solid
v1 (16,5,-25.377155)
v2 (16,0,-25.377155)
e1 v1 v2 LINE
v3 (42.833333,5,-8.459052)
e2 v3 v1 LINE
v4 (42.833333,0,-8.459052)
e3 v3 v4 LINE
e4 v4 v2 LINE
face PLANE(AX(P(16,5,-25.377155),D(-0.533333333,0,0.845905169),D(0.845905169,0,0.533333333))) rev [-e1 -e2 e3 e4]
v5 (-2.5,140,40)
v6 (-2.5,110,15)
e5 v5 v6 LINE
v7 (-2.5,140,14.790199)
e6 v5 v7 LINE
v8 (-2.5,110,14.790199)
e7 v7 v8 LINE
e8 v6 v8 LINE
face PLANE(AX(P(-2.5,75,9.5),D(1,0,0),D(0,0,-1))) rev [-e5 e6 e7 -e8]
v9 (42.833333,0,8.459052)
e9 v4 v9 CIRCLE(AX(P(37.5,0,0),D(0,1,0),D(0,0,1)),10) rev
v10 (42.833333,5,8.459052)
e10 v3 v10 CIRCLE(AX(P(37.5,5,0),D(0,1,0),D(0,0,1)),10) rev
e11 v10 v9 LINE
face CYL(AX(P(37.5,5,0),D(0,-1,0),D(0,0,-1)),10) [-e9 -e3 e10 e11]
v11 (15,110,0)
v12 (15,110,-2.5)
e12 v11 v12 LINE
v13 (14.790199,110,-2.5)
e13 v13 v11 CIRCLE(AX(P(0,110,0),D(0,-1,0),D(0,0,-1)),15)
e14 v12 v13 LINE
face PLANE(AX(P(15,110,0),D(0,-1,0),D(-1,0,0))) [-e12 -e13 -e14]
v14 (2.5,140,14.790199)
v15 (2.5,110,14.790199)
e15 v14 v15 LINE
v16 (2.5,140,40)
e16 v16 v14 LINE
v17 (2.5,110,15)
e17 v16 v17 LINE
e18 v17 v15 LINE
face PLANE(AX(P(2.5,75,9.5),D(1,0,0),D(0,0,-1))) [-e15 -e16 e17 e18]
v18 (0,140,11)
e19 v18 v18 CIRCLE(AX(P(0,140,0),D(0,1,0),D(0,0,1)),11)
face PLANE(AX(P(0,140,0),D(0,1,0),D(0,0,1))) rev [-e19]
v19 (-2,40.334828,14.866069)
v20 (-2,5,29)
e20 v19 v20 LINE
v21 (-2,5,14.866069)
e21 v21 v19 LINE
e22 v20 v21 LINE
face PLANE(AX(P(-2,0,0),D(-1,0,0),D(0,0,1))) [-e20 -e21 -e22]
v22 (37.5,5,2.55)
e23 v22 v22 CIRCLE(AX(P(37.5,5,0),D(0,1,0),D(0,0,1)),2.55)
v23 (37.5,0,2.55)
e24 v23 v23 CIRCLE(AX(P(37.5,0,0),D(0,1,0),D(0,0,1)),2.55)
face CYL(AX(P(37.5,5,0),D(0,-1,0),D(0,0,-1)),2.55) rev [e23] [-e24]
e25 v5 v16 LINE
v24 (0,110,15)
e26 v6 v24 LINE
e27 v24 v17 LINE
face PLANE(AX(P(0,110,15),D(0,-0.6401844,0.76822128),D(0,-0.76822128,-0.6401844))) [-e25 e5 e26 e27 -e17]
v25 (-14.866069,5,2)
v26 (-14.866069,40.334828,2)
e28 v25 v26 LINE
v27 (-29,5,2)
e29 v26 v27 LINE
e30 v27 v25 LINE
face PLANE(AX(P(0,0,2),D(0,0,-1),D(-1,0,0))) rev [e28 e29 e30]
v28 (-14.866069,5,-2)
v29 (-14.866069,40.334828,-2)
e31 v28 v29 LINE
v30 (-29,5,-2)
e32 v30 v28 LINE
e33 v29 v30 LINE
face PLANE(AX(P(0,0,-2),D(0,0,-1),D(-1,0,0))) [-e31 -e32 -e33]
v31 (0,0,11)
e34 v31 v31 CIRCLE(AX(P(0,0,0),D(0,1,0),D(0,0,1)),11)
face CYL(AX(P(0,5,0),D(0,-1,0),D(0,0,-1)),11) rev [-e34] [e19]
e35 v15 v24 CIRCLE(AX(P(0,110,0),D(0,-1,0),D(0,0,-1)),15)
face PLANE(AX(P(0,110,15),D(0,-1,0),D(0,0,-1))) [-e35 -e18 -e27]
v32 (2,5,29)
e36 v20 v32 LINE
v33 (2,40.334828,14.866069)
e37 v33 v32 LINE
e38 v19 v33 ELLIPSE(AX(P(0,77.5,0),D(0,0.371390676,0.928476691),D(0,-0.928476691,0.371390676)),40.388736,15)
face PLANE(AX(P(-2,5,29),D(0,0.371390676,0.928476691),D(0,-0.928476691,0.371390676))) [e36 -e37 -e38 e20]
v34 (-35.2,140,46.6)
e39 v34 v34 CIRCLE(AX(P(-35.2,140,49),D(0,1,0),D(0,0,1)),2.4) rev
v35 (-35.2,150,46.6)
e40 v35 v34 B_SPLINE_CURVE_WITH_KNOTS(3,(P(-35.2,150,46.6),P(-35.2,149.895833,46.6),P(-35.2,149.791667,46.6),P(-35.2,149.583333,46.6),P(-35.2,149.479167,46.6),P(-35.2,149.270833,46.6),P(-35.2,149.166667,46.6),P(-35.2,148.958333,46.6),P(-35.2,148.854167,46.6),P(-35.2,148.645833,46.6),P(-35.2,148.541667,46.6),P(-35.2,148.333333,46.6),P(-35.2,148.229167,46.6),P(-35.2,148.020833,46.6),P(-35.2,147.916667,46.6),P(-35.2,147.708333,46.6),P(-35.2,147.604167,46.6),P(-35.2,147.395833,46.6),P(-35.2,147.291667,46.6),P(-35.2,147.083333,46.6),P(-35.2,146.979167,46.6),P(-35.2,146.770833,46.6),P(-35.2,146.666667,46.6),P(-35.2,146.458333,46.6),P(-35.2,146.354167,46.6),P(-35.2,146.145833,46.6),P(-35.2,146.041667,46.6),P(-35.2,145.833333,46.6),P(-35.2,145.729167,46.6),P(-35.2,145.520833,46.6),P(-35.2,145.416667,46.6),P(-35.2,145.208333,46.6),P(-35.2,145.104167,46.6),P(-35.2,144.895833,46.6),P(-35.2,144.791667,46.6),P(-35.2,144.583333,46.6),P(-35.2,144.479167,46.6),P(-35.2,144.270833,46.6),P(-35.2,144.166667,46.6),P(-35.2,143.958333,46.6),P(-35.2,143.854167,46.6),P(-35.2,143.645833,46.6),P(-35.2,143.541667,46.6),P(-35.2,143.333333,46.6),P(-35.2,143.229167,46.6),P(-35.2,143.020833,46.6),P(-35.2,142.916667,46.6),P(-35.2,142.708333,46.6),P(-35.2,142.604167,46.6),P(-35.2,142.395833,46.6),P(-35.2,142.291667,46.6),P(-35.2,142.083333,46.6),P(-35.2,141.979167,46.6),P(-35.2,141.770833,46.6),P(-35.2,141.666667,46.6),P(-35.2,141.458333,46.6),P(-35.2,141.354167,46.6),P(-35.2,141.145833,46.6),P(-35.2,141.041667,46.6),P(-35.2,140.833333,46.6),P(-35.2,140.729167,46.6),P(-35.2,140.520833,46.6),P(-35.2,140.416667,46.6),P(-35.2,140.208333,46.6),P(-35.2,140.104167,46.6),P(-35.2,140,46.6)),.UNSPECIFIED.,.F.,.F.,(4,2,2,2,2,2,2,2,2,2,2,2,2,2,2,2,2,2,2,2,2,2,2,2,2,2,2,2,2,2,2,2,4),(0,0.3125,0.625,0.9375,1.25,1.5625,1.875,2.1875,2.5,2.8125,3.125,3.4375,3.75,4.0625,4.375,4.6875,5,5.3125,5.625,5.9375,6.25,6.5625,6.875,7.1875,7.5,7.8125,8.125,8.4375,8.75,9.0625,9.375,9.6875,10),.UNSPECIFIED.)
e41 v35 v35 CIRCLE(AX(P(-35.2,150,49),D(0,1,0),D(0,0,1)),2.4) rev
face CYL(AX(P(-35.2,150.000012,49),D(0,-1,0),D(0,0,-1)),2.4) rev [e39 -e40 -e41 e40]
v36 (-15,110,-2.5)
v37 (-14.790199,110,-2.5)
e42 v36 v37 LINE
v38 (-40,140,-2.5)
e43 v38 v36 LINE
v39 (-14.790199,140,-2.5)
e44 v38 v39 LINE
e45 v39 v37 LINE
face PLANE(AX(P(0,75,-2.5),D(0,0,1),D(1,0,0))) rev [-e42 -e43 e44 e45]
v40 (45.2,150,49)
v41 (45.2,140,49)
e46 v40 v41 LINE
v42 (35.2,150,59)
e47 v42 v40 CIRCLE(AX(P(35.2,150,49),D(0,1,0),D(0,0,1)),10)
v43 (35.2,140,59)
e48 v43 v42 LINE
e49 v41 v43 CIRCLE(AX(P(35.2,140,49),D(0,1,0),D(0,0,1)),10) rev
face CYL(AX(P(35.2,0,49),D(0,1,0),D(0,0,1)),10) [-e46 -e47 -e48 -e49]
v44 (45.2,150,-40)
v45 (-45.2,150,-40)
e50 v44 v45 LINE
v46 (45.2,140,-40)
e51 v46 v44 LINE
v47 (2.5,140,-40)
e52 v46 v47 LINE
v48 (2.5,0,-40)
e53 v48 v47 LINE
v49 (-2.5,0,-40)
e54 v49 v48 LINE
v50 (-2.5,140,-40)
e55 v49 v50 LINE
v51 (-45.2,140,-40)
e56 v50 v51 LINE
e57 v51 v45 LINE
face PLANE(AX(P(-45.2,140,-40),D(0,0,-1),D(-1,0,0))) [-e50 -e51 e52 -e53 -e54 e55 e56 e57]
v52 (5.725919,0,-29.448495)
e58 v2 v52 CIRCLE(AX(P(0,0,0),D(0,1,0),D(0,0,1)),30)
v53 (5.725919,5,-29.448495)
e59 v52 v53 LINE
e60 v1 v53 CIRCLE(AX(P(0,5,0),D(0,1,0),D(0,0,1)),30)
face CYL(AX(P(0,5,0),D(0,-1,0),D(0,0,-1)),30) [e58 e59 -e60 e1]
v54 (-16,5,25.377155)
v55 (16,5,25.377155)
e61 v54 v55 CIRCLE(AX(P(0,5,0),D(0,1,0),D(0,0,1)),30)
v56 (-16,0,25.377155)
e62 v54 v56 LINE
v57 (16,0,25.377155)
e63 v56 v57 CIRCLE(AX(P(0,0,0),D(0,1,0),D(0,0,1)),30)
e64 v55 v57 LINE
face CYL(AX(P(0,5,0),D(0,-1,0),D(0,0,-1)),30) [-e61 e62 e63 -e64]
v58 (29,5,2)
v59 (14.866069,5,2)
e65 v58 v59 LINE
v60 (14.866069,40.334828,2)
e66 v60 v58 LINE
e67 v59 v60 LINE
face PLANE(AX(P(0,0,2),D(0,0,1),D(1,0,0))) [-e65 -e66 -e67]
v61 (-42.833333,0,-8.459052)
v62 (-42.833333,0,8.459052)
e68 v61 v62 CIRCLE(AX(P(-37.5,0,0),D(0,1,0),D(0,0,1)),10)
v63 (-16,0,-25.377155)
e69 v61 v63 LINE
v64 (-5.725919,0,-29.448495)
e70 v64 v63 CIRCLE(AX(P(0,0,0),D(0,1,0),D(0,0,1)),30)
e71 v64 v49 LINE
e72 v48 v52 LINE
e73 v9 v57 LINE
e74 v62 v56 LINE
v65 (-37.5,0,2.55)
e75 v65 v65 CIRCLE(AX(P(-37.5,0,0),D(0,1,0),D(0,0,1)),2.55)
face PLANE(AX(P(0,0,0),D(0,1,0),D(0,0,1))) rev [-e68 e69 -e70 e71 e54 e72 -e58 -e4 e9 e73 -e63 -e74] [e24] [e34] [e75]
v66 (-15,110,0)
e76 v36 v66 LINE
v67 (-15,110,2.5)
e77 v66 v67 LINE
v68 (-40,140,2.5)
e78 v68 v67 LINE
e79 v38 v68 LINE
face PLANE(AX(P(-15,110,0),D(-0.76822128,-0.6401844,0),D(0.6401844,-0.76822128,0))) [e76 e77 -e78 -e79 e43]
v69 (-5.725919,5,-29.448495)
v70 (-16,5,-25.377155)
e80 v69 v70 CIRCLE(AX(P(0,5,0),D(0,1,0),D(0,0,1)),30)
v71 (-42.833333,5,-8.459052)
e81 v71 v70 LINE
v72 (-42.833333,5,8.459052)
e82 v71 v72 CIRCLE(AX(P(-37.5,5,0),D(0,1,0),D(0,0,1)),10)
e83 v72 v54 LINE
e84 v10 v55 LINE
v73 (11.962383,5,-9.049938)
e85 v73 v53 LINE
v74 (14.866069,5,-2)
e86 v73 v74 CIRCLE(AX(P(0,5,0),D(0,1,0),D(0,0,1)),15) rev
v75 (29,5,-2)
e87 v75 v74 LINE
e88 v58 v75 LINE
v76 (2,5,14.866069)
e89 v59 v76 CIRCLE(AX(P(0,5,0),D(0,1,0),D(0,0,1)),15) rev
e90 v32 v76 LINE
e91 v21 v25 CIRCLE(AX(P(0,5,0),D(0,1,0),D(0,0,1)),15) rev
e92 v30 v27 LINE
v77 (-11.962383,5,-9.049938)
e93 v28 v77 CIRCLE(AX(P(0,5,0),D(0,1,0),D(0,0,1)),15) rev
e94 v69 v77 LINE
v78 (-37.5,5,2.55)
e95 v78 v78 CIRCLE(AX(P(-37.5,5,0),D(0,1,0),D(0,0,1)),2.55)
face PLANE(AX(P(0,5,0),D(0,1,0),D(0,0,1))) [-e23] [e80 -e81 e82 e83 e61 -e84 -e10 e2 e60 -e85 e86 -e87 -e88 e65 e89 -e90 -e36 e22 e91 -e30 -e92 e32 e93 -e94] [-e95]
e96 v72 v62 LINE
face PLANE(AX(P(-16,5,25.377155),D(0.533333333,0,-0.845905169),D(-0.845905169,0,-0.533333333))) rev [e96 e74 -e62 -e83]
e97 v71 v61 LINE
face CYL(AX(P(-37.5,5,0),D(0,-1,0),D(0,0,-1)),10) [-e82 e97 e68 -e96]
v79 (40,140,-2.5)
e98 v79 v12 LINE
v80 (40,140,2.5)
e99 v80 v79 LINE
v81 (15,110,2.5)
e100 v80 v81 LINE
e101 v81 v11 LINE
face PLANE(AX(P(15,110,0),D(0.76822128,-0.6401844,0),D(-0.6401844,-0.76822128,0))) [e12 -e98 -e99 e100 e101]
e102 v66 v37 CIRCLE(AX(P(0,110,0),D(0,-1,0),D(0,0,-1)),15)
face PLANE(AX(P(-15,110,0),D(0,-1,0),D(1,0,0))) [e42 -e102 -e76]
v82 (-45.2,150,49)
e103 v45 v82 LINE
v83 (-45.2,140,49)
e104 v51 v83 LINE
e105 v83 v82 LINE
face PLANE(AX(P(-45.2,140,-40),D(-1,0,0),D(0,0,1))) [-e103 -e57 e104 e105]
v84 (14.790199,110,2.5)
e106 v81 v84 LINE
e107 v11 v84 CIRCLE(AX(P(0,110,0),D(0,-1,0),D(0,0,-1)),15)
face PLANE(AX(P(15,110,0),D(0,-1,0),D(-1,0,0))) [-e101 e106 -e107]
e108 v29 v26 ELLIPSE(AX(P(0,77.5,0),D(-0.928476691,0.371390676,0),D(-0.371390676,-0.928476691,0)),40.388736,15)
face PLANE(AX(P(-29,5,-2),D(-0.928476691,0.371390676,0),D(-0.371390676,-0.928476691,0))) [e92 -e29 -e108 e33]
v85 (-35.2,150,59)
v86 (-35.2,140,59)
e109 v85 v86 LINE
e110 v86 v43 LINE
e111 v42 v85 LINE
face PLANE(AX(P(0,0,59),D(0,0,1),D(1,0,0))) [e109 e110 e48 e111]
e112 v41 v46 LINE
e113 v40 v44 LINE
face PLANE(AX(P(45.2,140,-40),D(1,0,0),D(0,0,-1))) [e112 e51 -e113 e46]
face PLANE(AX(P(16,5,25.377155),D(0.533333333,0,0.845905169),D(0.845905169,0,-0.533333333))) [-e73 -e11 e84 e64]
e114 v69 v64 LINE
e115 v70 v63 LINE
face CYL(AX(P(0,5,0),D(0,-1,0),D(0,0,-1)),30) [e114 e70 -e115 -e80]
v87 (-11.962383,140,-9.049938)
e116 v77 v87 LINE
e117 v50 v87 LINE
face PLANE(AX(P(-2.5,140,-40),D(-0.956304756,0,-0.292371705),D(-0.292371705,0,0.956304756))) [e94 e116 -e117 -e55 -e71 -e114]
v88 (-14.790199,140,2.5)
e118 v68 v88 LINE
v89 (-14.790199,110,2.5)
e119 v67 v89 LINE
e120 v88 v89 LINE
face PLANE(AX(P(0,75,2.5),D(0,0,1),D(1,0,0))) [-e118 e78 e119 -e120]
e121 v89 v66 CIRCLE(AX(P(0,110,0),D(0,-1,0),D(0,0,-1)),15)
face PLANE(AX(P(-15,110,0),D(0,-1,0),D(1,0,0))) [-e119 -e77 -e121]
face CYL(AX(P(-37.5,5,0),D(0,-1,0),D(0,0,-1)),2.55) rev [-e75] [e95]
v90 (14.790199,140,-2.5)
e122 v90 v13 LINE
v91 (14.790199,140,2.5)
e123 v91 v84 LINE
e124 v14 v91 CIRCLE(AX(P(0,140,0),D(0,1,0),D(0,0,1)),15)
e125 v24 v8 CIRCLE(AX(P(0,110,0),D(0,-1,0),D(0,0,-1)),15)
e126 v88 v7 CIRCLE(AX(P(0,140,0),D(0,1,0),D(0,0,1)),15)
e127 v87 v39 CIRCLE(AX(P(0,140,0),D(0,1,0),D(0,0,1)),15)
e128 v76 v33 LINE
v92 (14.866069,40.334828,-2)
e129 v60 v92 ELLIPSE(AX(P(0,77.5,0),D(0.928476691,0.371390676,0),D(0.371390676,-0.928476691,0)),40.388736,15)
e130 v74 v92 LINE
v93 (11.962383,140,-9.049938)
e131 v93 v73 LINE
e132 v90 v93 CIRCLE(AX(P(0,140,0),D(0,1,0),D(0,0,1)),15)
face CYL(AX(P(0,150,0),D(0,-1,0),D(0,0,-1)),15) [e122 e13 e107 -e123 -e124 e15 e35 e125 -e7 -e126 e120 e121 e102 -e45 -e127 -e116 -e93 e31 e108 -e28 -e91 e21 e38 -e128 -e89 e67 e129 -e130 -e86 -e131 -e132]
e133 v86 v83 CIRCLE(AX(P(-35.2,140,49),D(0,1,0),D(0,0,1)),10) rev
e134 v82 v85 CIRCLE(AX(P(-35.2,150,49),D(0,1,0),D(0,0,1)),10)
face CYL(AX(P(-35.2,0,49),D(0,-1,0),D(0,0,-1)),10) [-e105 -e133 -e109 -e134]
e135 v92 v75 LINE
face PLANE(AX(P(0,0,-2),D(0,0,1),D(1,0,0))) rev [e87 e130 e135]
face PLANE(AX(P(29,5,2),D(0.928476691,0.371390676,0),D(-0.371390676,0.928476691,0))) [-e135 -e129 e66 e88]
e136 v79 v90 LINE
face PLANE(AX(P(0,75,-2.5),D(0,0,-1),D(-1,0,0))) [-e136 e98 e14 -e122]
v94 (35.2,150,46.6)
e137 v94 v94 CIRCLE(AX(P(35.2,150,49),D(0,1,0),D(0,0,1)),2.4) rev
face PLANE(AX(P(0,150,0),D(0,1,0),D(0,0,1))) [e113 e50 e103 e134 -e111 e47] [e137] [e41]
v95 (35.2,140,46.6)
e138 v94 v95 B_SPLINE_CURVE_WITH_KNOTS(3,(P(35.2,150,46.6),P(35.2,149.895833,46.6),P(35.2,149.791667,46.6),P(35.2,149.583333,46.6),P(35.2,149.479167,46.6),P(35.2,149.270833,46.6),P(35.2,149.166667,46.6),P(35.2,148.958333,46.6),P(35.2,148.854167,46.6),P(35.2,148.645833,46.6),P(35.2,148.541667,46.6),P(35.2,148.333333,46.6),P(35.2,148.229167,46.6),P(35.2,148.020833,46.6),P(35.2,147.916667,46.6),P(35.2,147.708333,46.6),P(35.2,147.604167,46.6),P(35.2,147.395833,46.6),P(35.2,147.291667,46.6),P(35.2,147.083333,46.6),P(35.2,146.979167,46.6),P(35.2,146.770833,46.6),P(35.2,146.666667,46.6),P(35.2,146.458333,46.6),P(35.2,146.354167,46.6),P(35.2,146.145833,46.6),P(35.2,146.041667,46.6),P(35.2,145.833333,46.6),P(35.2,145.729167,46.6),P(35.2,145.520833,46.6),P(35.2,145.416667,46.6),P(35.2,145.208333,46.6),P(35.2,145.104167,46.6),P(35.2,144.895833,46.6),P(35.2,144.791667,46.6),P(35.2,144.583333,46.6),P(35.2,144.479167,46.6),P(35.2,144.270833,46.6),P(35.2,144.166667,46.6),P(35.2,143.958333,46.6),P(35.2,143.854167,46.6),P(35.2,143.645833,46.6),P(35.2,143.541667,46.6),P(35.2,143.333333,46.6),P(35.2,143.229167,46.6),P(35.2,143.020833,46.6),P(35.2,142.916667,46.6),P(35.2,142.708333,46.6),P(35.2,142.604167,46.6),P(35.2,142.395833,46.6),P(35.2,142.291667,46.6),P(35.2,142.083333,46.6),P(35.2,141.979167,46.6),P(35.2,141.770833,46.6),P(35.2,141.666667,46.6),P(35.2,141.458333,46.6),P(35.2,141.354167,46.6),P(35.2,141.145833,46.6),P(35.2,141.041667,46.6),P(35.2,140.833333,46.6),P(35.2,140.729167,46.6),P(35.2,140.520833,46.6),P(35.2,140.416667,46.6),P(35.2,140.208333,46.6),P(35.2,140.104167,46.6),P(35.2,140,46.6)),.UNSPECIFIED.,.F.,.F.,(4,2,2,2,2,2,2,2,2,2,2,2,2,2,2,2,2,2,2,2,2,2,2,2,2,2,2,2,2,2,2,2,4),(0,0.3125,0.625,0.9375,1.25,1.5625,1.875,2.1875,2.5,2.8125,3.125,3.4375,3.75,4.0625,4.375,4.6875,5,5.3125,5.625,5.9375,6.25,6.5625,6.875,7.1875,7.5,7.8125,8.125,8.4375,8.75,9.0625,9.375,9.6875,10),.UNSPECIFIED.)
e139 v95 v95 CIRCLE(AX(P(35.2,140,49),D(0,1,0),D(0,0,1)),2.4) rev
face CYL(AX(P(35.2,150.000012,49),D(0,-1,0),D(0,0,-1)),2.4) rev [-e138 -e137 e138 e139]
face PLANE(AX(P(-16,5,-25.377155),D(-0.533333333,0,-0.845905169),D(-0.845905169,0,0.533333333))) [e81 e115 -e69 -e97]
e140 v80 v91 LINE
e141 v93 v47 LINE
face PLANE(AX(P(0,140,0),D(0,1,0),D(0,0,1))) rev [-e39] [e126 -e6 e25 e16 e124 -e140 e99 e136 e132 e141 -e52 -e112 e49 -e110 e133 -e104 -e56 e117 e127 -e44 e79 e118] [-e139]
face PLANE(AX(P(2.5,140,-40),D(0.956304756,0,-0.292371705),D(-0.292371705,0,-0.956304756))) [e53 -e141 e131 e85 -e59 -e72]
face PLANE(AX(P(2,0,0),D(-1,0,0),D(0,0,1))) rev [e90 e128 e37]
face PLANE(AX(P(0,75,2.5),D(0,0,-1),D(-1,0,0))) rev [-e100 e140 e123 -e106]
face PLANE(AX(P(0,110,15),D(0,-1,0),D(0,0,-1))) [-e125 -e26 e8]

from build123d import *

# Parameters (mm, degrees)
SKETCH1_R                      = 2.55
SKETCH1_R_2                    = 11
BASE_DEPTH                     = 5
SKETCH1_3_R                    = 15
SKETCH1_3_R_2                  = 11
STEM_DEPTH                     = 150
RIBS_DEPTH                     = 2
CIRPATTERN1_COUNT              = 4
SKETCH4_W                      = 90.4
SKETCH4_H                      = 80
TOP_PLATE_DEPTH                = 10
SKETCH6_W                      = 90.4
SKETCH6_H                      = 10
BOSS_EXTRUDE7_DEPTH            = 19
RIB1_START                     = -2.5
RIB1_DEPTH                     = 5
CIRPATTERN6_COUNT              = 4
CUT_EXTRUDE1_REACH             = 170.039
SKETCH10_R                     = 2.4
CUT_EXTRUDE1_DIRECTION_2_DEPTH = 169.039429897
FILLET1_R                      = 10
FILLET2_R                      = 10
SKETCH13_W                     = 5
SKETCH13_H                     = 25.209800542
BOSS_EXTRUDE10_DEPTH           = 140
BOSS_EXTRUDE11_DEPTH           = 141
BOSS_EXTRUDE11_START           = -9.462383487
BOSS_EXTRUDE11_2_DEPTH         = 9.462383487
BOSS_EXTRUDE11_START_2         = -22
BOSS_EXTRUDE11_3_OUTLINE_W     = 26
BOSS_EXTRUDE11_3_OUTLINE_H     = 36
BOSS_EXTRUDE11_3_DEPTH         = 10.305131811
SKETCH16_W                     = 125.849741583
SKETCH16_H                     = 86.760976346
CUT_EXTRUDE2_DEPTH             = 169.039429897


with BuildPart() as part:
    # Sketch1 → base (new body)
    with BuildSketch(Plane(origin=(0, 0, 0), x_dir=(1, 0, 0), z_dir=(0, 1, 0))):
        with BuildLine():
            Line((-16, 25.377155081), (-42.833333333, 8.459051694))
            ThreePointArc((-42.833333333, 8.459051694), (-47.5, 0), (-42.833333333, -8.459051694))
            Line((-42.833333333, -8.459051694), (-16, -25.377155081))
            ThreePointArc((-16, -25.377155081), (0, -30), (16, -25.377155081))
            Line((16, -25.377155081), (42.833333333, -8.459051694))
            ThreePointArc((42.833333333, -8.459051694), (47.5, 0), (42.833333333, 8.459051694))
            Line((42.833333333, 8.459051694), (16, 25.377155081))
            ThreePointArc((16, 25.377155081), (0, 30), (-16, 25.377155081))
        make_face()
        with Locations(Location((-37.5, 0, 0), (0, 0, 270))):
            Circle(SKETCH1_R, mode=Mode.SUBTRACT)
        with Locations(Location((37.5, 0, 0), (0, 0, 270))):
            Circle(SKETCH1_R, mode=Mode.SUBTRACT)
        with Locations(Location((0, 0, 0), (0, 0, 270))):
            Circle(SKETCH1_R_2, mode=Mode.SUBTRACT)
    extrude(amount=BASE_DEPTH)

    # Sketch1<3> → stem (add)
    with BuildSketch(Plane(origin=(0, 0, 0), x_dir=(1, 0, 0), z_dir=(0, 1, 0))):
        with Locations(Location((0, 0, 0), (0, 0, 270))):
            Circle(SKETCH1_3_R)
        with Locations(Location((0, 0, 0), (0, 0, 270))):
            Circle(SKETCH1_3_R_2, mode=Mode.SUBTRACT)
    extrude(amount=STEM_DEPTH)

    # Sketch2 → ribs (add, symmetric)
    with BuildSketch(Plane(origin=(0, 0, 0), x_dir=(0, 0, -1), z_dir=(1, 0, 0))):
        Polygon((-13, 5), (-29, 5), (-13, 45), align=None)
    ribs = extrude(amount=RIBS_DEPTH, both=True)

    # CirPattern1: ribs ×4 about axis
    cirpattern1_axis = Axis((0, 0, 0), (0, 1, 0))
    for i in range(1, CIRPATTERN1_COUNT):
        add(ribs.rotate(cirpattern1_axis, i * 360 / CIRPATTERN1_COUNT))

    # Sketch4 → top plate (add)
    with BuildSketch(Plane(origin=(0, 150, 0), x_dir=(1, 0, 0), z_dir=(0, 1, 0))):
        Rectangle(SKETCH4_W, SKETCH4_H)
    extrude(amount=-TOP_PLATE_DEPTH)

    # Sketch6 → Boss-Extrude7 (add)
    with BuildSketch(Plane.XY.offset(40)):
        with Locations((0, 145)):
            Rectangle(SKETCH6_W, SKETCH6_H)
    extrude(amount=BOSS_EXTRUDE7_DEPTH)

    # Rib1: read off the stored shape, not the designer's step
    # Rib1 outline → Rib1 (add)
    with BuildSketch(Plane(origin=(0, 0, 0), x_dir=(0, 0, -1), z_dir=(1, 0, 0)).offset(RIB1_START)):
        Polygon((-15, 110), (-14.790199458, 110), (-14.790199458, 140), (-40, 140), align=None)
    rib1 = extrude(amount=RIB1_DEPTH)

    # CirPattern6: Rib1 ×4 about axis
    cirpattern6_axis = Axis((0, 0, 0), (0, 1, 0))
    for i in range(1, CIRPATTERN6_COUNT):
        add(rib1.rotate(cirpattern6_axis, i * 360 / CIRPATTERN6_COUNT))

    # Sketch10 → Cut-Extrude1 (cut, up to next)
    with BuildSketch(Plane(origin=(0, 150, 0), x_dir=(1, 0, 0), z_dir=(0, 1, 0)), mode=Mode.PRIVATE) as cut_extrude1_sk1:
        with Locations(Location((35.2, -49, 0), (0, 0, 90))):
            Circle(SKETCH10_R)
    cut_extrude1_tool1 = extrude(cut_extrude1_sk1.sketch, amount=-CUT_EXTRUDE1_REACH, mode=Mode.PRIVATE) & part.part
    # Sketch10 → Cut-Extrude1 (cut, up to next)
    with BuildSketch(Plane(origin=(0, 150, 0), x_dir=(1, 0, 0), z_dir=(0, 1, 0)), mode=Mode.PRIVATE) as cut_extrude1_sk2:
        with Locations(Location((-35.2, -49, 0), (0, 0, 90))):
            Circle(SKETCH10_R)
    cut_extrude1_tool2 = extrude(cut_extrude1_sk2.sketch, amount=-CUT_EXTRUDE1_REACH, mode=Mode.PRIVATE) & part.part
    add(cut_extrude1_tool1.solids().sort_by_distance((35.2, 150, 49))[0], mode=Mode.SUBTRACT)
    add(cut_extrude1_tool2.solids().sort_by_distance((-35.2, 150, 49))[0], mode=Mode.SUBTRACT)

    # Sketch10 → Cut-Extrude1 direction 2 (cut)
    with BuildSketch(Plane(origin=(0, 150, 0), x_dir=(1, 0, 0), z_dir=(0, 1, 0))):
        with Locations(Location((35.2, -49, 0), (0, 0, 90))):
            Circle(SKETCH10_R)
        with Locations(Location((-35.2, -49, 0), (0, 0, 90))):
            Circle(SKETCH10_R)
    extrude(amount=CUT_EXTRUDE1_DIRECTION_2_DEPTH, mode=Mode.SUBTRACT)

    # Fillet1
    fillet1_edges = [part.edges().sort_by_distance(p)[0] for p in [
        (-45.2, 145, 59),
    ]]
    fillet(fillet1_edges, radius=FILLET1_R)

    # Fillet2
    fillet2_edges = [part.edges().sort_by_distance(p)[0] for p in [
        (45.2, 145, 59),
    ]]
    fillet(fillet2_edges, radius=FILLET2_R)

    # Sketch13 → Boss-Extrude10 (add, through all)
    with BuildSketch(Plane.XZ.offset(-140)):
        with Locations((0, -27.395099729)):
            Rectangle(SKETCH13_W, SKETCH13_H)
    extrude(amount=BOSS_EXTRUDE10_DEPTH)

    # Boss-Extrude11: read off the stored shape, not the designer's step
    # Boss-Extrude11 outline → Boss-Extrude11 (add)
    with BuildSketch(Plane(origin=(0, 0, 0), x_dir=(1, 0, 0), z_dir=(0, 1, 0))):
        with BuildLine():
            ThreePointArc((2.5, 14.790199458), (7.779960403, 12.824672164), (11.962383487, 9.049938193))
            Line((11.962383487, 9.049938193), (2.5, 40))
            Line((2.5, 40), (2.5, 14.790199458))
        make_face()
        with BuildLine():
            ThreePointArc((-11.962383487, 9.049938193), (-7.779960403, 12.824672164), (-2.5, 14.790199458))
            Line((-2.5, 14.790199458), (-2.5, 40))
            Line((-2.5, 40), (-11.962383487, 9.049938193))
        make_face()
    extrude(amount=BOSS_EXTRUDE11_DEPTH)

    # Boss-Extrude11 2 outline → Boss-Extrude11 2 (add)
    with BuildSketch(Plane(origin=(0, 0, 0), x_dir=(1, 0, 0), z_dir=(0, 1, 0)).offset(BOSS_EXTRUDE11_START)):
        with BuildLine():
            Line((-2.5, 40), (-11.962383487, 9.049938193))
            ThreePointArc((-11.962383487, 9.049938193), (0, 15), (11.962383487, 9.049938193))
            Line((11.962383487, 9.049938193), (2.5, 40))
            Line((2.5, 40), (-2.5, 40))
        make_face()
    extrude(amount=BOSS_EXTRUDE11_2_DEPTH)

    # Boss-Extrude11 3 outline → Boss-Extrude11 3 (cut)
    with BuildSketch(Plane(origin=(0, 0, 0), x_dir=(1, 0, 0), z_dir=(0, 0.9563047559630354, 0.2923717047227371)).offset(BOSS_EXTRUDE11_START_2)):
        with Locations((0, 22)):
            Rectangle(BOSS_EXTRUDE11_3_OUTLINE_W, BOSS_EXTRUDE11_3_OUTLINE_H)
    extrude(amount=BOSS_EXTRUDE11_3_DEPTH, mode=Mode.SUBTRACT)

    # Sketch16 → Cut-Extrude2 (cut, through all)
    with BuildSketch(Plane.XY):
        with Locations((6.783470695, -43.380488173)):
            Rectangle(SKETCH16_W, SKETCH16_H)
    extrude(amount=-CUT_EXTRUDE2_DEPTH, mode=Mode.SUBTRACT)


solid = part.part
